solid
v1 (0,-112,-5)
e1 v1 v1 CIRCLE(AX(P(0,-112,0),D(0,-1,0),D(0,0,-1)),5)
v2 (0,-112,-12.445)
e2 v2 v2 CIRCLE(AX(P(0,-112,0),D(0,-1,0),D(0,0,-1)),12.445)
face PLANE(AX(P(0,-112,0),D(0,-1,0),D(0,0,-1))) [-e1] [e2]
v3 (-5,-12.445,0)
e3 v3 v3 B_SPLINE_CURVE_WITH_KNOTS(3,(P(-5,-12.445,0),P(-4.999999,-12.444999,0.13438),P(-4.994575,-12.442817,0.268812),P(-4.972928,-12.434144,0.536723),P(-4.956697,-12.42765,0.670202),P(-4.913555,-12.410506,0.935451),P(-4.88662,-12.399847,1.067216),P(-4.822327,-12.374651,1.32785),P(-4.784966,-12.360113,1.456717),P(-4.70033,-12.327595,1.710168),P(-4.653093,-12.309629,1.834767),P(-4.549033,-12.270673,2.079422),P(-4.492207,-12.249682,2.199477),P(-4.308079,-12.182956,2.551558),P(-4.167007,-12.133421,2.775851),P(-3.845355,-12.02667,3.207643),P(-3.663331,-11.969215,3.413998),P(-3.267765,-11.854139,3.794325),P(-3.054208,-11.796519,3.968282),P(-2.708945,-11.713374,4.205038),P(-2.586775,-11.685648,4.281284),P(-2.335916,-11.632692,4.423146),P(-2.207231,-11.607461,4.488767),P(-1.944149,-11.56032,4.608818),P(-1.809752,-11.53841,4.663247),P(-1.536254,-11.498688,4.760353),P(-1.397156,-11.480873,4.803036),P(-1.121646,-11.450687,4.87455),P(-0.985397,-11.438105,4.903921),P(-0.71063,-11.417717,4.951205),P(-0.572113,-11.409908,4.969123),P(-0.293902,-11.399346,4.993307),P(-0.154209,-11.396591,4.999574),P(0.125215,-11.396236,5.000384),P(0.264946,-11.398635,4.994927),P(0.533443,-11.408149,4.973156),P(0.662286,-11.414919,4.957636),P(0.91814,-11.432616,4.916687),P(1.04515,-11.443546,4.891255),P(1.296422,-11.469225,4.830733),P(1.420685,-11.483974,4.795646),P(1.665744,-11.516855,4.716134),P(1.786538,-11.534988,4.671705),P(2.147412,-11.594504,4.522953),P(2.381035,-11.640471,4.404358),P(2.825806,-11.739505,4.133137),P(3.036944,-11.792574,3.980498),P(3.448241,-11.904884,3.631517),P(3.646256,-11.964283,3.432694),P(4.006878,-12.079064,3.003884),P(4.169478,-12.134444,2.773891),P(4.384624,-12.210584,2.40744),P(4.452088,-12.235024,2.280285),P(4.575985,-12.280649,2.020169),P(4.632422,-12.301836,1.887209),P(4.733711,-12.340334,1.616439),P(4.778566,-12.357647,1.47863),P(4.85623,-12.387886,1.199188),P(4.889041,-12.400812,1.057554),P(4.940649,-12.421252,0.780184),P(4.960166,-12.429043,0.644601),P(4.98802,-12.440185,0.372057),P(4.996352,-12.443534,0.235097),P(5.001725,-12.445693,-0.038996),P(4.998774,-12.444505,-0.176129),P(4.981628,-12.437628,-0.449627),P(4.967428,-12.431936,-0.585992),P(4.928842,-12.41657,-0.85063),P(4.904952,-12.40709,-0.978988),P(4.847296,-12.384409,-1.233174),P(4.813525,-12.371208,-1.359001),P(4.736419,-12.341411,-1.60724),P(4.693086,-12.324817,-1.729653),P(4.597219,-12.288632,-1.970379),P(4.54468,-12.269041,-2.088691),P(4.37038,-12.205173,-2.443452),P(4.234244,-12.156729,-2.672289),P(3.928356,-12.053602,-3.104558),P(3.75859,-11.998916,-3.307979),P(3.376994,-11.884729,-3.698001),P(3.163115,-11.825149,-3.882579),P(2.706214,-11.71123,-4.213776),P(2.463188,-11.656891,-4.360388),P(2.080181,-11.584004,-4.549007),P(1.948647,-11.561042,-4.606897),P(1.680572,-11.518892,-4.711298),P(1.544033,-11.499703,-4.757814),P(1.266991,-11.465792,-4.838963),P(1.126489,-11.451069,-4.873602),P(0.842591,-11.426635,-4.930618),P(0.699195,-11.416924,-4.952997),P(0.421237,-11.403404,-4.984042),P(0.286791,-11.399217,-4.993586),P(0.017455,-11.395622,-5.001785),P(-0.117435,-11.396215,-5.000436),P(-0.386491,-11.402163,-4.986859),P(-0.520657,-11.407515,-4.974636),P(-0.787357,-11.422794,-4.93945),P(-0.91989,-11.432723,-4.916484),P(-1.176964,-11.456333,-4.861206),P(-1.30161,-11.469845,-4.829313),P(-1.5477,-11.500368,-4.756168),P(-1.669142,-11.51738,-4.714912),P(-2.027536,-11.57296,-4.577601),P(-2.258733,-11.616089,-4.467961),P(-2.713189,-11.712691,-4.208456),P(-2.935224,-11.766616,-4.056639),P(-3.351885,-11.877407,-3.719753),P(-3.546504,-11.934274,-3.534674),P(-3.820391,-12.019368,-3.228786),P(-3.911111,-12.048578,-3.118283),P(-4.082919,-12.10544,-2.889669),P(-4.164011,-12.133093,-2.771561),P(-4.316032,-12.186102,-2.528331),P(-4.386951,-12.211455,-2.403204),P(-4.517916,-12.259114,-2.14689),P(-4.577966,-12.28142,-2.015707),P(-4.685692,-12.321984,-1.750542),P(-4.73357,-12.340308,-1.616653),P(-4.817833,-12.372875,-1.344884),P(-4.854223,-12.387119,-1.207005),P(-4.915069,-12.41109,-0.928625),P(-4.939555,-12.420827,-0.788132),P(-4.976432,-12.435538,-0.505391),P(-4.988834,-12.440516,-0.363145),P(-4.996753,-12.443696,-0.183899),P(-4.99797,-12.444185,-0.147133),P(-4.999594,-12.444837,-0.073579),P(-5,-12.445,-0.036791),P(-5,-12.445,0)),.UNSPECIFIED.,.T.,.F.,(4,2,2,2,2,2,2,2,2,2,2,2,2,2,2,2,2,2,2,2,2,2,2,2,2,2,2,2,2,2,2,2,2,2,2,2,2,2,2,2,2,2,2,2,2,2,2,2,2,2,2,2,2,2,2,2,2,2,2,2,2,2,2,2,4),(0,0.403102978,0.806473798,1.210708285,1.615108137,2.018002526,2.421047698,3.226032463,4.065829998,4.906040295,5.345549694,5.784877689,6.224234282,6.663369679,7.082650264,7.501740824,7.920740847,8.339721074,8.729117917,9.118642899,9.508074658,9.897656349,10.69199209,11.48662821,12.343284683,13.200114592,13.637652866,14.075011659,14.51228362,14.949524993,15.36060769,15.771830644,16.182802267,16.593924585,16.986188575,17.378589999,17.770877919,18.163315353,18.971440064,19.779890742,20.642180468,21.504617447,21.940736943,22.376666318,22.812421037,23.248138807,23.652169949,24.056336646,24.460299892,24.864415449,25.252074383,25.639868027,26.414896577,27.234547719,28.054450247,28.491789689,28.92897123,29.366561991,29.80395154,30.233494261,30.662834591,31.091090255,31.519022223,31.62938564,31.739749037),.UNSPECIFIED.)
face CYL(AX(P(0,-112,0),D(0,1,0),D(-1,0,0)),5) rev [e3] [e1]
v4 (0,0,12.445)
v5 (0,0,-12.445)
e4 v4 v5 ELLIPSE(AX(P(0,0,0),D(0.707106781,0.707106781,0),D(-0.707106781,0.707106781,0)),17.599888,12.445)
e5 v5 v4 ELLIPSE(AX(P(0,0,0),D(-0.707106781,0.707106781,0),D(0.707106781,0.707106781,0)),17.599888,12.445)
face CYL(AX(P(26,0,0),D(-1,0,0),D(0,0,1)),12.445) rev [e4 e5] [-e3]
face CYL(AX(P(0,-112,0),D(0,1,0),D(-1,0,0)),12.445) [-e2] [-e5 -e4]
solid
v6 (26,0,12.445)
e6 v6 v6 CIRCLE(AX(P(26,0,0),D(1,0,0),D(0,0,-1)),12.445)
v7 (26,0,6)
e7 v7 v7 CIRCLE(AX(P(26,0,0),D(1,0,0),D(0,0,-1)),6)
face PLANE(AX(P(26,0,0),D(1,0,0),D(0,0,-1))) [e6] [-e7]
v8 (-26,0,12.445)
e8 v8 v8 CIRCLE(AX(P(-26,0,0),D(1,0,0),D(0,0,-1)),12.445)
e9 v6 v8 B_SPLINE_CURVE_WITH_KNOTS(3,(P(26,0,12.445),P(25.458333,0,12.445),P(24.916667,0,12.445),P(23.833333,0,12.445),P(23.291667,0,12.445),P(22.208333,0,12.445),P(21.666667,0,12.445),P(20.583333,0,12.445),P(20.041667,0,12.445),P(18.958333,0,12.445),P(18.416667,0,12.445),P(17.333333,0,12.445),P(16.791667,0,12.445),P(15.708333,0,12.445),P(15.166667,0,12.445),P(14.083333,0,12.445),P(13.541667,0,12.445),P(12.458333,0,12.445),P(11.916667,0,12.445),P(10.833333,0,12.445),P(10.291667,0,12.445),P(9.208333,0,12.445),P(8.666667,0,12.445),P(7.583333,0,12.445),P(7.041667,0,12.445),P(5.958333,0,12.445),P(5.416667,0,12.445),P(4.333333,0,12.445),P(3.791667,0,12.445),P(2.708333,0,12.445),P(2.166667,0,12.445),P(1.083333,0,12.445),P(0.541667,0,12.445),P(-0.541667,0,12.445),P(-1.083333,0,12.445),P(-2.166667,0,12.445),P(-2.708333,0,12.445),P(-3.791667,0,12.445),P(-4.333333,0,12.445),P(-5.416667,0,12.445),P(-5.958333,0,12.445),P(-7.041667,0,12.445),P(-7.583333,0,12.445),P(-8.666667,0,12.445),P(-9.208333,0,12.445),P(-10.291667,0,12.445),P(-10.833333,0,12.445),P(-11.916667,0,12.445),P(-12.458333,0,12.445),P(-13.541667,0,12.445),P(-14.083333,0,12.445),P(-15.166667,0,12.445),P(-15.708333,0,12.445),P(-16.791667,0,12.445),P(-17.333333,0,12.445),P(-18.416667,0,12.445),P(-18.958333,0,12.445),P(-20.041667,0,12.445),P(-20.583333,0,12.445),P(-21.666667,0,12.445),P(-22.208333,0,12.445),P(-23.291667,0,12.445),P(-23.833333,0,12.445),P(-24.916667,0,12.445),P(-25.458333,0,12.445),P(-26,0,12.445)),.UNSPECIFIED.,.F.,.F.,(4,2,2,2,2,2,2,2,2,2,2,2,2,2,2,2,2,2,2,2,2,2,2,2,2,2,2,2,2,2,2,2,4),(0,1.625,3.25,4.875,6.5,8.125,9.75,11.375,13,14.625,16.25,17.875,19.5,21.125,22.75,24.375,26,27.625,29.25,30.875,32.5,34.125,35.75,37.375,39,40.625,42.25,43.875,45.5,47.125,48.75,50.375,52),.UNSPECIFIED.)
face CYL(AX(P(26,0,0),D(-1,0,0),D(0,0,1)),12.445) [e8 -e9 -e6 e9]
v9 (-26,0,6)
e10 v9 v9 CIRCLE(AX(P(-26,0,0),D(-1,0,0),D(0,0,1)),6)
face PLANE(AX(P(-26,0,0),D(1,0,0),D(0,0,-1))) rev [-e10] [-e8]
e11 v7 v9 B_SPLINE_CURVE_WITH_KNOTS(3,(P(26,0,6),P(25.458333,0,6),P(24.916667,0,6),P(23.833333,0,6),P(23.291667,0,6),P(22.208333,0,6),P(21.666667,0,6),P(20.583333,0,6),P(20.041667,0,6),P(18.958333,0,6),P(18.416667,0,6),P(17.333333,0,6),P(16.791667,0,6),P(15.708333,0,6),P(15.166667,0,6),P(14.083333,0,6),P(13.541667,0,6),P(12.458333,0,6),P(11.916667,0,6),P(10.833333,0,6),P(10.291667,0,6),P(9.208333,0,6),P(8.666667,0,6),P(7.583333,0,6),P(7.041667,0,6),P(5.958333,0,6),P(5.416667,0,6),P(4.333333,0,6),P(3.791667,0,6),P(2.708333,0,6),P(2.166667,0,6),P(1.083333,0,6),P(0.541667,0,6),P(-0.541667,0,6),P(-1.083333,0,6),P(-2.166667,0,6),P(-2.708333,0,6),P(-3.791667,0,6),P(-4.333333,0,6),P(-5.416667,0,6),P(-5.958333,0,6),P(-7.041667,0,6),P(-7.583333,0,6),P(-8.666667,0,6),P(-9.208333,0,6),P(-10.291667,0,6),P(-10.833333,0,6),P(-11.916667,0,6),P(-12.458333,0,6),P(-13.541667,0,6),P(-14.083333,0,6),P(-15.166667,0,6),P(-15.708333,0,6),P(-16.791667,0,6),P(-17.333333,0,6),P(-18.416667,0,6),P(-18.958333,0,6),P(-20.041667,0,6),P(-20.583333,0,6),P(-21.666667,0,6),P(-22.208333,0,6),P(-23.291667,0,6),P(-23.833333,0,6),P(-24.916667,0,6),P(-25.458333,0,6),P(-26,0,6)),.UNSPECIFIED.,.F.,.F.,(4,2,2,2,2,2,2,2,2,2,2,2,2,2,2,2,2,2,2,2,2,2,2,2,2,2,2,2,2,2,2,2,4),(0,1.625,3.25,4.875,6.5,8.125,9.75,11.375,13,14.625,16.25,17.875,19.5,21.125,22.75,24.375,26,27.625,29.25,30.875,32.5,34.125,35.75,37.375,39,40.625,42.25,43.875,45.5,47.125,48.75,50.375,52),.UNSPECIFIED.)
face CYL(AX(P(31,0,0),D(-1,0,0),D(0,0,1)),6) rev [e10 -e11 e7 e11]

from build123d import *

# Parameters (mm, degrees)
PIPE_START                      = -112
PIPE_26_9_X_3_2_1_OUTLINE_R     = 12.445
PIPE_26_9_X_3_2_1_OUTLINE_R_2   = 5
PIPE_26_9_X_3_2_1_DEPTH         = 99.5549999
PIPE_START_2                    = -12.4450001
PIPE_26_9_X_3_2_1_2_OUTLINE_R   = 12.445
PIPE_26_9_X_3_2_1_2_OUTLINE_R_2 = 5
PIPE_26_9_X_3_2_1_2_DEPTH       = 12.4450002
PIPE_START_3                    = -13
PIPE_26_9_X_3_2_1_3_DEPTH       = 26
PIPE_START_4                    = -26
PIPE_26_9_X_3_2_1_4_OUTLINE_R   = 12.445
PIPE_26_9_X_3_2_1_4_OUTLINE_R_2 = 5
PIPE_26_9_X_3_2_1_4_DEPTH       = 52
SKETCH13_R                      = 6
CUT_EXTRUDE1_DEPTH              = 57


with BuildPart() as part:
    # Pipe 26.9 X 3.2(1): read off the stored shape, not the designer's step
    # Pipe 26.9 X 3.2(1) outline → Pipe 26.9 X 3.2(1) (new body)
    with BuildSketch(Plane(origin=(0, 0, 0), x_dir=(1, 0, 0), z_dir=(0, 1, 0)).offset(PIPE_START)):
        Circle(PIPE_26_9_X_3_2_1_OUTLINE_R)
        Circle(PIPE_26_9_X_3_2_1_OUTLINE_R_2, mode=Mode.SUBTRACT)
    extrude(amount=PIPE_26_9_X_3_2_1_DEPTH)

    # Pipe 26.9 X 3.2_1 2 outline → Pipe 26.9 X 3.2_1 2 (add)
    with BuildSketch(Plane(origin=(0, 0, 0), x_dir=(1, 0, 0), z_dir=(0, 1, 0)).offset(PIPE_START_2)):
        Circle(PIPE_26_9_X_3_2_1_2_OUTLINE_R)
        Circle(PIPE_26_9_X_3_2_1_2_OUTLINE_R_2, mode=Mode.SUBTRACT)
    extrude(amount=PIPE_26_9_X_3_2_1_2_DEPTH)

    # Pipe 26.9 X 3.2_1 3 outline → Pipe 26.9 X 3.2_1 3 (cut)
    with BuildSketch(Plane.YZ.offset(PIPE_START_3)):
        with BuildLine():
            ThreePointArc((0, 12.445), (-12.445, 0), (0, -12.445))
            Line((0, -12.445), (0, 12.445))
        make_face()
    extrude(amount=PIPE_26_9_X_3_2_1_3_DEPTH, mode=Mode.SUBTRACT)


with BuildPart() as body_2:
    # Pipe 26.9 X 3.2_1 4 outline → Pipe 26.9 X 3.2_1 4 (new body)
    with BuildSketch(Plane.YZ.offset(PIPE_START_4)):
        Circle(PIPE_26_9_X_3_2_1_4_OUTLINE_R)
        Circle(PIPE_26_9_X_3_2_1_4_OUTLINE_R_2, mode=Mode.SUBTRACT)
    extrude(amount=PIPE_26_9_X_3_2_1_4_DEPTH)

    # Sketch13 → Cut-Extrude1 (cut)
    with BuildSketch(Plane.ZY.offset(26)):
        Circle(SKETCH13_R)
    extrude(amount=-CUT_EXTRUDE1_DEPTH, mode=Mode.SUBTRACT)


solid = Compound([part.part, body_2.part])
